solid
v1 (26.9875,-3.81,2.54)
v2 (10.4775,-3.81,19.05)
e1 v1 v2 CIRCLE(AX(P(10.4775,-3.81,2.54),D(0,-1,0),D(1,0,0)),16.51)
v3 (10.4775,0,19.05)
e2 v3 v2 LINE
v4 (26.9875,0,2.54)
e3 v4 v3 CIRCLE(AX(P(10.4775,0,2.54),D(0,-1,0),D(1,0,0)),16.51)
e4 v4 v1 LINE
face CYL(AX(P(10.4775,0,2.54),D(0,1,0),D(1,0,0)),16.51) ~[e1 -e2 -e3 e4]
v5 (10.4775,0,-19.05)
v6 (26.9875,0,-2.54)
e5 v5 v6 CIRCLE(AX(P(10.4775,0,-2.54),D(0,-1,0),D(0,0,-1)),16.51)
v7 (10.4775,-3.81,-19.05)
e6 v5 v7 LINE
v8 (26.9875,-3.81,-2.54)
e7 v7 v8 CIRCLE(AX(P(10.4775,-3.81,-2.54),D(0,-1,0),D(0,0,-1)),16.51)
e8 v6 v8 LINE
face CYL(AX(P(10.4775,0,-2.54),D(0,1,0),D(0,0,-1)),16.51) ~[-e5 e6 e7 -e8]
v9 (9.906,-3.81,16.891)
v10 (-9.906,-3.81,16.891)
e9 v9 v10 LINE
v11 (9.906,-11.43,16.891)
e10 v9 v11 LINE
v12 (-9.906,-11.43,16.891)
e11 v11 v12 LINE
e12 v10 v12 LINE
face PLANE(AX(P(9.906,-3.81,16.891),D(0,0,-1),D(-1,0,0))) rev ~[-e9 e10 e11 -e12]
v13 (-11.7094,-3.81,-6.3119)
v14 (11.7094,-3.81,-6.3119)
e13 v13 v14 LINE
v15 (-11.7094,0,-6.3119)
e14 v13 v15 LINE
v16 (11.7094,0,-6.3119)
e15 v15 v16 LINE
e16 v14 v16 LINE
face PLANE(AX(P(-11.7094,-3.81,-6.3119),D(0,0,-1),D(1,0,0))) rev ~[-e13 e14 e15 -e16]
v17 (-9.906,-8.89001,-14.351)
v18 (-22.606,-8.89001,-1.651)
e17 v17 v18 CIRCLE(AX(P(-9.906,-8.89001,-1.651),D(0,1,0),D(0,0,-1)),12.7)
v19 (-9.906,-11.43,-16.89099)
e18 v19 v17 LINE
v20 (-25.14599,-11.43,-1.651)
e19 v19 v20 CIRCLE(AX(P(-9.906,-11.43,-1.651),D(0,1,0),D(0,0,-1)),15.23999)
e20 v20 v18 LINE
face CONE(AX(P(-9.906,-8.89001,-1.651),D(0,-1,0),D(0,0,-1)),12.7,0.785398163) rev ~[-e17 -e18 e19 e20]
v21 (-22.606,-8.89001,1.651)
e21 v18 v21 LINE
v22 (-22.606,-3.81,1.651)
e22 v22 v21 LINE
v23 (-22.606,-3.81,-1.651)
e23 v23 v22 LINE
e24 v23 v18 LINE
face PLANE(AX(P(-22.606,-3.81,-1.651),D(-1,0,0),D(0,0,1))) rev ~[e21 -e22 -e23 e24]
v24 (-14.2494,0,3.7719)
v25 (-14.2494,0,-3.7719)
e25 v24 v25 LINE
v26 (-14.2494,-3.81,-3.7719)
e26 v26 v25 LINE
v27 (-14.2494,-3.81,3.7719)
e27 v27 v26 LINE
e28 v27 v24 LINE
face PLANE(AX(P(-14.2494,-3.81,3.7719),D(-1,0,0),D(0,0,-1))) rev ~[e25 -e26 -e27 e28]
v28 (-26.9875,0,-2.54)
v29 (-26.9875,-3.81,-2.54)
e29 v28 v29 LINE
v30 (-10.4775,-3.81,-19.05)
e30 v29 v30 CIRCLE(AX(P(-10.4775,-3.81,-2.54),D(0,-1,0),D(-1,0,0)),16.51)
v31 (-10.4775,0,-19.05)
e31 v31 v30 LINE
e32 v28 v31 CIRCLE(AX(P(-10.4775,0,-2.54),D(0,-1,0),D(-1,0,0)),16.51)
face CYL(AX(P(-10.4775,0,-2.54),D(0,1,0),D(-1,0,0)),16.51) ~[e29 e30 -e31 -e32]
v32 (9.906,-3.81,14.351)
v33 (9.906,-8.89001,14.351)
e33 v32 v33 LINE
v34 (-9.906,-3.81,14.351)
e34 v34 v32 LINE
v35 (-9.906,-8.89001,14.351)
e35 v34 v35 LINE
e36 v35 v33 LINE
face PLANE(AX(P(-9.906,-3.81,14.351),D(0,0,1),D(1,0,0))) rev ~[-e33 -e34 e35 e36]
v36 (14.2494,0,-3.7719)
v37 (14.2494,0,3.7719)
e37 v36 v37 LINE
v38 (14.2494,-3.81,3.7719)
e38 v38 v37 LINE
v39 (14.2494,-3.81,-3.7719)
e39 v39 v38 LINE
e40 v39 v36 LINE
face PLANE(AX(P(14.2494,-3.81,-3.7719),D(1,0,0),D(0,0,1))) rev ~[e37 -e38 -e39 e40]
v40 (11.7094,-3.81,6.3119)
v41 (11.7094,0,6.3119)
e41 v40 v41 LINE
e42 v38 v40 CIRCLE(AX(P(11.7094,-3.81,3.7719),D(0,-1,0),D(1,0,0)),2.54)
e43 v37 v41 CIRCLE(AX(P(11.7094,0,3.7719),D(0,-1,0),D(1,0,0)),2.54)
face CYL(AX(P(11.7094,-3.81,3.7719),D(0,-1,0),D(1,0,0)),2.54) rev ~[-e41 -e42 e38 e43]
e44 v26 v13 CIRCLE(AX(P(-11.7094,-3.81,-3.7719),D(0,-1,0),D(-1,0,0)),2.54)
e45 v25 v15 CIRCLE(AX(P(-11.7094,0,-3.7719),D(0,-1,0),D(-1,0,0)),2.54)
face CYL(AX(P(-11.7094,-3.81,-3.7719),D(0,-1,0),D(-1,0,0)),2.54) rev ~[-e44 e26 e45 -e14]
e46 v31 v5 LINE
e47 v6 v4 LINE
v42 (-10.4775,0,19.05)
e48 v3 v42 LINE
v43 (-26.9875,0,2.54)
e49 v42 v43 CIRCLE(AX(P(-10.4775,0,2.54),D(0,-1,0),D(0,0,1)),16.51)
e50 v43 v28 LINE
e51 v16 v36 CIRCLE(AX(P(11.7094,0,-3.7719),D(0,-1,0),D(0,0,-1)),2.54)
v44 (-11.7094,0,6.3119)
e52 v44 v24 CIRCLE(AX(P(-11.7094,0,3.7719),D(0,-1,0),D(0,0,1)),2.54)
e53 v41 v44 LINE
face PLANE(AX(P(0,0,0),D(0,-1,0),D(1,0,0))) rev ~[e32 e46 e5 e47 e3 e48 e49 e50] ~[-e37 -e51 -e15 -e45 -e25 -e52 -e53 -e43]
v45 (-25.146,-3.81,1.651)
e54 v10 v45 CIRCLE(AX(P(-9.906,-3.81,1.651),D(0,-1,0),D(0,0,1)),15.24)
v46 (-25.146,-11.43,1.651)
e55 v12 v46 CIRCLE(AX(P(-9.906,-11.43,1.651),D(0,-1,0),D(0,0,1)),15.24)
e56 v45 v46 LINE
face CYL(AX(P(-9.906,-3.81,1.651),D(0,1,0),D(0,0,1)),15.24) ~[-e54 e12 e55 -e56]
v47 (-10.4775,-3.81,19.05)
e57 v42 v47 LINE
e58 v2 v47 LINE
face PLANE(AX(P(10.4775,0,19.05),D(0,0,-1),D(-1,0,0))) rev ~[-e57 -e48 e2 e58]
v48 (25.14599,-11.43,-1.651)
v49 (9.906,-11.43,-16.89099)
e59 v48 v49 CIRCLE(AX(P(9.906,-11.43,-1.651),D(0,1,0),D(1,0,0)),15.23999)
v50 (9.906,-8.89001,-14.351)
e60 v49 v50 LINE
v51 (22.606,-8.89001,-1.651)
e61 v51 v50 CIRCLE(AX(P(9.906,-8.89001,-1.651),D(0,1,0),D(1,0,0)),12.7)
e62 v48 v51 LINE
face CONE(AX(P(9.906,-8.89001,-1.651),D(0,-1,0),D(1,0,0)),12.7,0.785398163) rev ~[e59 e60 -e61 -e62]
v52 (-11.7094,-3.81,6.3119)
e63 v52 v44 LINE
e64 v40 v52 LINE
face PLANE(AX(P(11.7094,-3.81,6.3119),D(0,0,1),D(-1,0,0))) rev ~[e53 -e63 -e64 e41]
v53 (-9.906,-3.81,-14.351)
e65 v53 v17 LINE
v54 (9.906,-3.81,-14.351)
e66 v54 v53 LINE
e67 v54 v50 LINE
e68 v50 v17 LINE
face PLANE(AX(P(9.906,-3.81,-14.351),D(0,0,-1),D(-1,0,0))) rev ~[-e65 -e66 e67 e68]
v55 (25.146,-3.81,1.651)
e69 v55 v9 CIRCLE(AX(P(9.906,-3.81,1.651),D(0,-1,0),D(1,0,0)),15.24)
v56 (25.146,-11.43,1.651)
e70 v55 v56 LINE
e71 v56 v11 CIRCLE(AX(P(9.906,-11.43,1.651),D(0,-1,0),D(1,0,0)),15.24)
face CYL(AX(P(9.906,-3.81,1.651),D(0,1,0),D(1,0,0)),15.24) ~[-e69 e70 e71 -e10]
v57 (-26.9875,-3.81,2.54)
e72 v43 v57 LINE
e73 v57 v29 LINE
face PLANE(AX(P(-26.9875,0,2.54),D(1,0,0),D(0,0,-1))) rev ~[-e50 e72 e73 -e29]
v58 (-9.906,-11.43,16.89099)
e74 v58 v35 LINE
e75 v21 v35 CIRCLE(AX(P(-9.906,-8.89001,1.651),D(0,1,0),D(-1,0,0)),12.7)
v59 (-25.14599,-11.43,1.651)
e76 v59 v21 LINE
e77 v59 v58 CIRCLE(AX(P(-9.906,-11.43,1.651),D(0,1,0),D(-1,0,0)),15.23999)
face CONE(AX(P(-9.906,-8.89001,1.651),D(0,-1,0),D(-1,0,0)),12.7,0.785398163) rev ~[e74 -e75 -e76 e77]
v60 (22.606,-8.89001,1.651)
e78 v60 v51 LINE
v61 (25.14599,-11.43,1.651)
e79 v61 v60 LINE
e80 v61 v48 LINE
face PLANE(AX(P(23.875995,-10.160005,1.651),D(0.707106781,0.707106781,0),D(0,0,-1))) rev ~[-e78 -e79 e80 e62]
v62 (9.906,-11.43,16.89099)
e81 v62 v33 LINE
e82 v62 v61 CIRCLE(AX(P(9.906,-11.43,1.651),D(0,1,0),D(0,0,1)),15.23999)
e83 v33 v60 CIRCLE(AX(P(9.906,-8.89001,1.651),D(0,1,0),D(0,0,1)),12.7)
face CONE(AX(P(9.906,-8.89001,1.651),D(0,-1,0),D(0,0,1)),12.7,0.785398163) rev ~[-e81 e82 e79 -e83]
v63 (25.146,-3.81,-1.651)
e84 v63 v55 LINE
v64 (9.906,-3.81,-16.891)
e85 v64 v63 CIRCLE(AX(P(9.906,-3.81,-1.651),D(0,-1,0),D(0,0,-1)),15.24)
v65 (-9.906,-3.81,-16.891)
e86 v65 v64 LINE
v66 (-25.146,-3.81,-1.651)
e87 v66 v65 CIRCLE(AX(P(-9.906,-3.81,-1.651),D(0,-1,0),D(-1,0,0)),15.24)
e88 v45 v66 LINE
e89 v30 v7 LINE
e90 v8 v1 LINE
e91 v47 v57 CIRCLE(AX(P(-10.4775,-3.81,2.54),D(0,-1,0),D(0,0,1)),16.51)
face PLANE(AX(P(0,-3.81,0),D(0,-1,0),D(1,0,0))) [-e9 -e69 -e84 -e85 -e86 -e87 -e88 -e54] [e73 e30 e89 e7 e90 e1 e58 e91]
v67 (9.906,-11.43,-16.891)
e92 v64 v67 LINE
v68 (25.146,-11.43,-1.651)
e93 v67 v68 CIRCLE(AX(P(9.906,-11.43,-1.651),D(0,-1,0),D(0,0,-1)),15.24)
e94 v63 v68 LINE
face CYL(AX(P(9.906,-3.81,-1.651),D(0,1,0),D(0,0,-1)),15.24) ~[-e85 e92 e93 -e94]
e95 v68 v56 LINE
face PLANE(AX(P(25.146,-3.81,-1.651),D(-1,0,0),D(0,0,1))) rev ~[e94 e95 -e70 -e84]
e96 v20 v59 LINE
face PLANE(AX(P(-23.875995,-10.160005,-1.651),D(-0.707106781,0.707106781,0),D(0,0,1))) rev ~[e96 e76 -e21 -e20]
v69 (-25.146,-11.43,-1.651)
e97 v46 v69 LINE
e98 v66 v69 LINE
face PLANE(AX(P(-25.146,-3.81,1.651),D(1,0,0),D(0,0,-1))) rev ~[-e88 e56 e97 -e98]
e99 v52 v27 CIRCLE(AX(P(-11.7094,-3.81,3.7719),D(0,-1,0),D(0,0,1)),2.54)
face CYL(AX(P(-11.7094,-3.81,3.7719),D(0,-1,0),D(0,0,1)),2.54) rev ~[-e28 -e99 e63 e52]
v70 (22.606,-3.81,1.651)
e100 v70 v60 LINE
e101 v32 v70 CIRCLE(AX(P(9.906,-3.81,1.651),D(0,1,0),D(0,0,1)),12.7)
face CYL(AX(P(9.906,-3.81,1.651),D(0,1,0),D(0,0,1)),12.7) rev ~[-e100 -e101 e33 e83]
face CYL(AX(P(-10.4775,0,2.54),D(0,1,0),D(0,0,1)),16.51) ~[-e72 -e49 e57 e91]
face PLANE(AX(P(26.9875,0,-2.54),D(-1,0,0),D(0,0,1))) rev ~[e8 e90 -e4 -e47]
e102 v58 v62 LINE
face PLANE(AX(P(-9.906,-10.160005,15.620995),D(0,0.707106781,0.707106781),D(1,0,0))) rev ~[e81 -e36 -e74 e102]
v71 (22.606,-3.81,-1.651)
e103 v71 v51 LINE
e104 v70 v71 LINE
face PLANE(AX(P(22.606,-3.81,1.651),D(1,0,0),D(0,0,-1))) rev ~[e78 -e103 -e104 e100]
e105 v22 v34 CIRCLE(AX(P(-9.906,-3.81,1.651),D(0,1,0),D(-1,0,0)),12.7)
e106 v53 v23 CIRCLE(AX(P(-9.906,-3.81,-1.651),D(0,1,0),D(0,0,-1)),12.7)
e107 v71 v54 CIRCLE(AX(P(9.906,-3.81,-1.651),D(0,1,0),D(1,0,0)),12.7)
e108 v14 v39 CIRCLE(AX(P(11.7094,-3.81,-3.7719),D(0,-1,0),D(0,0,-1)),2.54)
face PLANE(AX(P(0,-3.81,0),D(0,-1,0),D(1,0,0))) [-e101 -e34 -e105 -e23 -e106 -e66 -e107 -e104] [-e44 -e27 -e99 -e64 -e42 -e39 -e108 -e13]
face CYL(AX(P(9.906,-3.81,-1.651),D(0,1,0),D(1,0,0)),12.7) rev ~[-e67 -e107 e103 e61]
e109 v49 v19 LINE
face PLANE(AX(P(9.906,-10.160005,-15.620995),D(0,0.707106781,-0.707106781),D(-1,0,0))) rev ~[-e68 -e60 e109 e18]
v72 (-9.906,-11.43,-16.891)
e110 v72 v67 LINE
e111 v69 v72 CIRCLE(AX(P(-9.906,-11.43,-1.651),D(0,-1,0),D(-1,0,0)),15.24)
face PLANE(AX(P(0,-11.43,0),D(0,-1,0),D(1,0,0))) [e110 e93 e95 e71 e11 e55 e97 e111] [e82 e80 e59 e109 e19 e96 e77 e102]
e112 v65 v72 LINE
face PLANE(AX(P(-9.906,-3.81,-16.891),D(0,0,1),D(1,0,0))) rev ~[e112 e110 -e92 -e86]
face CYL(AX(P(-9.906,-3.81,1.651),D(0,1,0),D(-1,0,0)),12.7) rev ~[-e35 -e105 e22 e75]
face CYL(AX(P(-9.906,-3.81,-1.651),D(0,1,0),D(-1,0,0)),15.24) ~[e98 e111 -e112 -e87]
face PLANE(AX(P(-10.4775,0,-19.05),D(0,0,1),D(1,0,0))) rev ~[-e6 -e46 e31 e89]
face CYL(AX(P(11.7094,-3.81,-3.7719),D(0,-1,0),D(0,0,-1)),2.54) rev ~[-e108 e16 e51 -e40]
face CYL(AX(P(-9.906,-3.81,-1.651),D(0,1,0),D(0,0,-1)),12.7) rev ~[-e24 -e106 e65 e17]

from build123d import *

# Parameters (mm, degrees)
F1_DEPTH = 3.81
F3_DEPTH = 7.62
F5_DEPTH = 3.811
F6_SIZE  = 2.53999


# Not quite as in the source:
# - a fillet or chamfer is up to 0.001 mm smaller than in the source, because OpenCascade refuses the exact size


with BuildPart() as f1:
    # F0 (on Front) → F1 (new body)
    with BuildSketch(Plane.XZ):
        with BuildLine():
            ThreePointArc((-26.9875, -2.54), (-22.1518329574, -14.2143329574), (-10.4775, -19.05))
            Line((-10.4775, -19.05), (10.4775, -19.05))
            ThreePointArc((10.4775, -19.05), (22.1518329574, -14.2143329574), (26.9875, -2.54))
            Line((26.9875, -2.54), (26.9875, 2.54))
            ThreePointArc((26.9875, 2.54), (22.1518329574, 14.2143329574), (10.4775, 19.05))
            Line((10.4775, 19.05), (-10.4775, 19.05))
            ThreePointArc((-10.4775, 19.05), (-22.1518329574, 14.2143329574), (-26.9875, 2.54))
            Line((-26.9875, 2.54), (-26.9875, -2.54))
        make_face()
    extrude(amount=F1_DEPTH)

    # F2 (on face) → F3 (join)
    with BuildSketch(Plane.XZ.offset(3.81)):
        with BuildLine():
            Line((9.906, 16.891), (-9.906, 16.891))
            ThreePointArc((-9.906, 16.891), (-20.6823073453, 12.4273073453), (-25.146, 1.651))
            Line((-25.146, 1.651), (-25.146, -1.651))
            ThreePointArc((-25.146, -1.651), (-20.6823073453, -12.4273073453), (-9.906, -16.891))
            Line((-9.906, -16.891), (9.906, -16.891))
            ThreePointArc((9.906, -16.891), (20.6823073453, -12.4273073453), (25.146, -1.651))
            Line((25.146, -1.651), (25.146, 1.651))
            ThreePointArc((25.146, 1.651), (20.6823073453, 12.4273073453), (9.906, 16.891))
        make_face()
        with BuildLine():
            Line((9.906, -14.351), (-9.906, -14.351))
            ThreePointArc((-9.906, -14.351), (-18.8862561211, -10.6312561211), (-22.606, -1.651))
            Line((-22.606, -1.651), (-22.606, 1.651))
            ThreePointArc((-22.606, 1.651), (-18.8862561211, 10.6312561211), (-9.906, 14.351))
            Line((-9.906, 14.351), (9.906, 14.351))
            ThreePointArc((9.906, 14.351), (18.8862561211, 10.6312561211), (22.606, 1.651))
            Line((22.606, 1.651), (22.606, -1.651))
            ThreePointArc((22.606, -1.651), (18.8862561211, -10.6312561211), (9.906, -14.351))
        make_face(mode=Mode.SUBTRACT)
    extrude(amount=F3_DEPTH)

    # F4 (on face) → F5 (cut, through all)
    with BuildSketch(Plane.XZ.offset(3.81)):
        with BuildLine():
            ThreePointArc((-14.2494, -3.7719), (-13.5054512242, -5.5679512242), (-11.7094, -6.3119))
            Line((-11.7094, -6.3119), (11.7094, -6.3119))
            ThreePointArc((11.7094, -6.3119), (13.5054512242, -5.5679512242), (14.2494, -3.7719))
            Line((14.2494, -3.7719), (14.2494, 3.7719))
            ThreePointArc((14.2494, 3.7719), (13.5054512242, 5.5679512242), (11.7094, 6.3119))
            Line((11.7094, 6.3119), (-11.7094, 6.3119))
            ThreePointArc((-11.7094, 6.3119), (-13.5054512242, 5.5679512242), (-14.2494, 3.7719))
            Line((-14.2494, 3.7719), (-14.2494, -3.7719))
        make_face()
    extrude(amount=-F5_DEPTH, mode=Mode.SUBTRACT)

    # F6 (size 2.54 in the source; OpenCascade refuses exactly that, so slightly less here)
    f6_edges = [f1.edges().sort_by_distance(p)[0] for p in [
        (-18.886256, -11.43, 10.631256),
        (0, -11.43, 14.351),
        (18.886256, -11.43, 10.631256),
        (18.886256, -11.43, -10.631256),
        (-18.886256, -11.43, -10.631256),
        (0, -11.43, -14.351),
        (22.606, -11.43, 0),
        (-22.606, -11.43, 0),
    ]]
    chamfer(f6_edges, length=F6_SIZE)


solid = f1.part
